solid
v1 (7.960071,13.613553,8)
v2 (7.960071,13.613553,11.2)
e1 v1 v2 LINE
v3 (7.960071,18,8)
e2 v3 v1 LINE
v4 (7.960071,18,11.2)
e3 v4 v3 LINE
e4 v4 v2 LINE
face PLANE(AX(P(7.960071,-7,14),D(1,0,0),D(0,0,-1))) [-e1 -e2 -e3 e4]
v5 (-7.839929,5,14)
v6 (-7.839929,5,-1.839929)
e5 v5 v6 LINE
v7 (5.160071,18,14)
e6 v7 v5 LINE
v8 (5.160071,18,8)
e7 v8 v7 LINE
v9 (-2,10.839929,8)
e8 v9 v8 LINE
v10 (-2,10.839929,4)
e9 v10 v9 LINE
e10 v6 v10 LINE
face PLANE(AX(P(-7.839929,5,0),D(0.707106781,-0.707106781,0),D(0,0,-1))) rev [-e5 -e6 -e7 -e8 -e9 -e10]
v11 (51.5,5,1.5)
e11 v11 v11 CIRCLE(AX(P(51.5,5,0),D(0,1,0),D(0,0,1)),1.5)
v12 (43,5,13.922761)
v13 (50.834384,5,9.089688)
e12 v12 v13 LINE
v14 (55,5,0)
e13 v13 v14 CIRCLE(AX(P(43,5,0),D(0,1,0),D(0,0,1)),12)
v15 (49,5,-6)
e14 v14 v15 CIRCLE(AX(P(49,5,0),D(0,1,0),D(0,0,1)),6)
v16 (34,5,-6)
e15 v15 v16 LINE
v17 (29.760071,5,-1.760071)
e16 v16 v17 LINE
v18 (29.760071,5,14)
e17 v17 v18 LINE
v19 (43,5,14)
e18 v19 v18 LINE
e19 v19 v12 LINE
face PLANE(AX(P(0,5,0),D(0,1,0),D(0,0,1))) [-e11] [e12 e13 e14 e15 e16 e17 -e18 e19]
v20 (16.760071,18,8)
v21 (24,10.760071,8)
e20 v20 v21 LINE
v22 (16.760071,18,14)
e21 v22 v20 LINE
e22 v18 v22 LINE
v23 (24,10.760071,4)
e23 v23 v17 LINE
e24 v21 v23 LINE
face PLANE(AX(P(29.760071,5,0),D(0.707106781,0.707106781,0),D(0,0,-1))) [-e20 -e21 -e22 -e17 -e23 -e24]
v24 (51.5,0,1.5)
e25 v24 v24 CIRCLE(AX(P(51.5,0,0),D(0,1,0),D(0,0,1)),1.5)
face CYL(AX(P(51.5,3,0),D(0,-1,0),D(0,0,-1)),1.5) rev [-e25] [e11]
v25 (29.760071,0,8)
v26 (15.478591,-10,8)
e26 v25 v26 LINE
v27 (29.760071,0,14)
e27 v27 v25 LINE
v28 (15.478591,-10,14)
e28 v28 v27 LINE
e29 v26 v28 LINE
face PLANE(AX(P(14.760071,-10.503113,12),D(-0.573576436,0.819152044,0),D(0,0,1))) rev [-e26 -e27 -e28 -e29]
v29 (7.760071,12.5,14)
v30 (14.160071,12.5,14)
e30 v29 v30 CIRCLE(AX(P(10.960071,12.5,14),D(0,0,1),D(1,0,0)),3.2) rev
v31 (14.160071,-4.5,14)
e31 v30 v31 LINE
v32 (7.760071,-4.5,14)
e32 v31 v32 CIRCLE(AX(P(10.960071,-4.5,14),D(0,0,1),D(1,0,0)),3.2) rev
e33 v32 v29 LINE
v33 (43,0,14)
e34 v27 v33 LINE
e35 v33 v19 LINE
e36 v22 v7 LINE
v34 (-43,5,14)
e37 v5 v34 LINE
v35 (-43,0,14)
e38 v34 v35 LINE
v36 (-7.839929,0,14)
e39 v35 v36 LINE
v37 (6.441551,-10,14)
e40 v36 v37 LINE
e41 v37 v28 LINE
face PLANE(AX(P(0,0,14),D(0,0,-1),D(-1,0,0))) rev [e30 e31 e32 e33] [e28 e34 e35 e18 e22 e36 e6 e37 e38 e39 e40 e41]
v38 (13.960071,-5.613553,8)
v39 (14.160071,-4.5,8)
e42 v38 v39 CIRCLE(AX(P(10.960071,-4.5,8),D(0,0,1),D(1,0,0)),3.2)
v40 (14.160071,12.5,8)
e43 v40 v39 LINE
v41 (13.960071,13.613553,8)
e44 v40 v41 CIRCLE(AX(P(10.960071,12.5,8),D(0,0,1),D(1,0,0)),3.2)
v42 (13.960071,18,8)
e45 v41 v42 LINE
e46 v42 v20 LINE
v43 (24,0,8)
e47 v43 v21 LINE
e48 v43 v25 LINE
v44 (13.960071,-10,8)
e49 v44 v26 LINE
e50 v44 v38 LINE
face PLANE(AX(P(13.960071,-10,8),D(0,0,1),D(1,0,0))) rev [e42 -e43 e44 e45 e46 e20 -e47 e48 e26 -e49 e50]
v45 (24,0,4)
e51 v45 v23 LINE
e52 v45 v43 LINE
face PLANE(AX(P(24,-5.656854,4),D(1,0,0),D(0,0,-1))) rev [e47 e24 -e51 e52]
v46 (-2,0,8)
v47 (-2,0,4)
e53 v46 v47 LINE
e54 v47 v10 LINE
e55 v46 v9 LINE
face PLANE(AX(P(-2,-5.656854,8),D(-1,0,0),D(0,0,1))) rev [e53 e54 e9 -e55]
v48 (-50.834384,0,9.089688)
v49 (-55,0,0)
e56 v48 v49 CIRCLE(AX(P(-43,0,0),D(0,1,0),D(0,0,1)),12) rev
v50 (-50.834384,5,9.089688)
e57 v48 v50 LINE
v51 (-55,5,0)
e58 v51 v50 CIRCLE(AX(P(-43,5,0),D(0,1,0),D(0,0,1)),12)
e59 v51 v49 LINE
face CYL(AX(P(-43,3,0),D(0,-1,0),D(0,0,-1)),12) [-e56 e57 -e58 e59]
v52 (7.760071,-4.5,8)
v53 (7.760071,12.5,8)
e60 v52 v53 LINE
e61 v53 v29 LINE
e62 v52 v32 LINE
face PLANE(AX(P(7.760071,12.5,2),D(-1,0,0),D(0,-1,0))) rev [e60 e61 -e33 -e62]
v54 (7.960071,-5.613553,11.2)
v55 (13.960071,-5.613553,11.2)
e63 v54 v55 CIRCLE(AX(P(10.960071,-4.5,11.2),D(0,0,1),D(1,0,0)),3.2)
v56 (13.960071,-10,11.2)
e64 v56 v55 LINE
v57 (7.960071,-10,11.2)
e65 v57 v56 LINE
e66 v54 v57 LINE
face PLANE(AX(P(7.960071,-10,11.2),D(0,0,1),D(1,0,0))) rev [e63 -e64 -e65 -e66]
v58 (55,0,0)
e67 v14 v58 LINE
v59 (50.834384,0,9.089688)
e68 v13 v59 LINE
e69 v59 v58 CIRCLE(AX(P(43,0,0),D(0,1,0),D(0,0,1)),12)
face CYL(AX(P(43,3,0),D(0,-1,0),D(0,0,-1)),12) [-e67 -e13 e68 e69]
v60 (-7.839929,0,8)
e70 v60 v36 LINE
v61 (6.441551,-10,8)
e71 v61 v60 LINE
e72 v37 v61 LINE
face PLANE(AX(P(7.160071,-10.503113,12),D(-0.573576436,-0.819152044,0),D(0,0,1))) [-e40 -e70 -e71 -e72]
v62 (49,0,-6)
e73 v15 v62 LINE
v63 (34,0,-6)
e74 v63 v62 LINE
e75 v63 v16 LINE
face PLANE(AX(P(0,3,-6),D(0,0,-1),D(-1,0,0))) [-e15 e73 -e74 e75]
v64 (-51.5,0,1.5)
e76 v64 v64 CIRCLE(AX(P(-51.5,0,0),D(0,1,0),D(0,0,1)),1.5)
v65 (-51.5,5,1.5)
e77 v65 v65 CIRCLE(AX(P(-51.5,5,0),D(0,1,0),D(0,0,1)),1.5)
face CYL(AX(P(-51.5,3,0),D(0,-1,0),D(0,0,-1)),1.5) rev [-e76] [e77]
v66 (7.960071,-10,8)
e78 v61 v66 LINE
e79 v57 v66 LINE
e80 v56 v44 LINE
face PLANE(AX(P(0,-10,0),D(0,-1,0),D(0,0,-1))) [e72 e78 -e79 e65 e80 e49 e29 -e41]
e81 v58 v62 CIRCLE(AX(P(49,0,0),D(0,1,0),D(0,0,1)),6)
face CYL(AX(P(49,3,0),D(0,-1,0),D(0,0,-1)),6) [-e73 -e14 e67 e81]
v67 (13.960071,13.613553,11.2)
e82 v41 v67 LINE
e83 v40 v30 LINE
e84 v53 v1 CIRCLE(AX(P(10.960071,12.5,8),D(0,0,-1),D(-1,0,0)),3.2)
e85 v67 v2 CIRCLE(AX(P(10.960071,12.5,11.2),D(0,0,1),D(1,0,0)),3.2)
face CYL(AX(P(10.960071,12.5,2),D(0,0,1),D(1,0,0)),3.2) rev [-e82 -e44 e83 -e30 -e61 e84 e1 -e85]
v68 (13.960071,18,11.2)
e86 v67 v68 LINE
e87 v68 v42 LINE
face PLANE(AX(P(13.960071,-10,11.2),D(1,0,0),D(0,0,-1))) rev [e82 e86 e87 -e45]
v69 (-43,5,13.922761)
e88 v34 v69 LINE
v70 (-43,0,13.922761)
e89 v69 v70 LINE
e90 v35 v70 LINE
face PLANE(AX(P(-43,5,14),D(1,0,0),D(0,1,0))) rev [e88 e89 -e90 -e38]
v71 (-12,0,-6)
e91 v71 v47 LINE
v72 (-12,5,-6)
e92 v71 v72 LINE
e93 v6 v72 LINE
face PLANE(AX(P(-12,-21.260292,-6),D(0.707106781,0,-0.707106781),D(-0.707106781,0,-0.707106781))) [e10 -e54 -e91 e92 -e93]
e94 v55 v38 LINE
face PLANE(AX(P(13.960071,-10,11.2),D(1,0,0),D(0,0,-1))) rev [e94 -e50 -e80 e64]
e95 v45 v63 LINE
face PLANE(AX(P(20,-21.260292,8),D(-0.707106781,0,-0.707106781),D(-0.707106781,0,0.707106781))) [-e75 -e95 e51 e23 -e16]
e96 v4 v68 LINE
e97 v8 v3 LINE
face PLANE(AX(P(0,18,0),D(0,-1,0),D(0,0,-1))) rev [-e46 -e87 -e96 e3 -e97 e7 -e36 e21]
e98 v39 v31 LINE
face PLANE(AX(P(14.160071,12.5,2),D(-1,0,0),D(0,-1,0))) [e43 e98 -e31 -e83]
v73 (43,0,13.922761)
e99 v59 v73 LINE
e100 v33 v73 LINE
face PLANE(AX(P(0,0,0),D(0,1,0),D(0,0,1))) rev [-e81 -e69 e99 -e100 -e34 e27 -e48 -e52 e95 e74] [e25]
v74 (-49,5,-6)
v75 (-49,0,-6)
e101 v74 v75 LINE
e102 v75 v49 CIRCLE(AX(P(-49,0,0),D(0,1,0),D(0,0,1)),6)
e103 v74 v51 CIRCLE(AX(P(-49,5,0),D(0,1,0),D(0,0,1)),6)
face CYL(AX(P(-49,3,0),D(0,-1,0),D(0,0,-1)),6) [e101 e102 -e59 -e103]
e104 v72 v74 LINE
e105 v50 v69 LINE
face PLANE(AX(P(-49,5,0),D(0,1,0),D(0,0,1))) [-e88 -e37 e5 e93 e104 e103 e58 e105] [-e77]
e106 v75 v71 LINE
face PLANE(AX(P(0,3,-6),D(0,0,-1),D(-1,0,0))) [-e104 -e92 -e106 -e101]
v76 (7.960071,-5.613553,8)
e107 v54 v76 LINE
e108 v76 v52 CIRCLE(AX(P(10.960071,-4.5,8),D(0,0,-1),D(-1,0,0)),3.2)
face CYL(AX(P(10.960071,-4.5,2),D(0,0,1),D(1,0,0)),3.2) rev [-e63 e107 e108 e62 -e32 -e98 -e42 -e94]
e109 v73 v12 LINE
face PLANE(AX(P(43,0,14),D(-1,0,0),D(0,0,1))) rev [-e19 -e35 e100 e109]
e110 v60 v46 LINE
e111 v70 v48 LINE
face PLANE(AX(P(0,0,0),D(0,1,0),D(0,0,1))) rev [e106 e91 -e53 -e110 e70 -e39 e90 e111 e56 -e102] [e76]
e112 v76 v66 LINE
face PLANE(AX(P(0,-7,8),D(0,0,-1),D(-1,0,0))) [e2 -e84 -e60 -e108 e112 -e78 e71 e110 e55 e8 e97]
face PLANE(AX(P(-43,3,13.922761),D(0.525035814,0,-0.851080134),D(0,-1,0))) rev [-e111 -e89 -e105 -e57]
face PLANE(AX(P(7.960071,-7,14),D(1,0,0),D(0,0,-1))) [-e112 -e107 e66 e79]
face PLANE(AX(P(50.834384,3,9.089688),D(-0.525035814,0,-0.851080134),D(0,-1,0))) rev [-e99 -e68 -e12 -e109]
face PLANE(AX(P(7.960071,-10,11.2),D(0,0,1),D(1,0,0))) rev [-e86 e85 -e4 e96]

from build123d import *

# Parameters (mm, degrees)
BOSS_EXTRUDE1_DEPTH = 3
CUT_EXTRUDE1_DEPTH  = 10
CUT_EXTRUDE3_START  = 8
SKETCH8_W           = 6
SKETCH8_H           = 3
CUT_EXTRUDE3_DEPTH  = 6
BOSS_EXTRUDE4_START = 18
BOSS_EXTRUDE4_DEPTH = 28
BOSS_EXTRUDE5_DEPTH = 3
CUT_EXTRUDE4_DEPTH  = 3
CUT_EXTRUDE5_DEPTH  = 10
SKETCH18_R          = 1.5
BOSS_EXTRUDE9_DEPTH = 2
CHAMFER1_SIZE       = 15
CHAMFER2_SIZE       = 15
CHAMFER2_SIZE_2     = 10.503113073
CUT_EXTRUDE6_DEPTH  = 5
BOSS_EXTRUDE8_DEPTH = 2
CHAMFER3_DEPTH      = 6
CHAMFER3_2_DEPTH    = 5


with BuildPart() as part:
    # Sketch1 → Boss-Extrude1 (new body)
    with BuildSketch(Plane(origin=(0, 0, 0), x_dir=(1, 0, 0), z_dir=(0, 1, 0))):
        with BuildLine():
            ThreePointArc((-49, -6), (-53.242640687, -4.242640687), (-55, 0))
            ThreePointArc((-55, 0), (-51.485281374, -8.485281374), (-43, -12))
            Line((-43, -12), (43, -12))
            ThreePointArc((43, -12), (51.485281374, -8.485281374), (55, 0))
            ThreePointArc((55, 0), (53.242640687, -4.242640687), (49, -6))
            Line((49, -6), (-49, -6))
        make_face()
        with BuildLine():
            Line((-53, 0), (-55, 0))
            ThreePointArc((-55, 0), (-53.242640687, -4.242640687), (-49, -6))
            Line((-49, -6), (49, -6))
            ThreePointArc((49, -6), (53.242640687, -4.242640687), (55, 0))
            Line((55, 0), (53, 0))
            ThreePointArc((53, 0), (51.5, -1.5), (50, 0))
            Line((50, 0), (-50, 0))
            ThreePointArc((-50, 0), (-51.5, -1.5), (-53, 0))
        make_face()
        with BuildLine():
            Line((49, 6), (-49, 6))
            ThreePointArc((-49, 6), (-53.242640687, 4.242640687), (-55, 0))
            Line((-55, 0), (-53, 0))
            ThreePointArc((-53, 0), (-51.5, 1.5), (-50, 0))
            Line((-50, 0), (50, 0))
            ThreePointArc((50, 0), (51.5, 1.5), (53, 0))
            Line((53, 0), (55, 0))
            ThreePointArc((55, 0), (53.242640687, 4.242640687), (49, 6))
        make_face()
    extrude(amount=BOSS_EXTRUDE1_DEPTH)

    # Sketch2 → Cut-Extrude1 (cut)
    with BuildSketch(Plane(origin=(0, 3, 0), x_dir=(1, 0, 0), z_dir=(0, 1, 0))):
        Polygon((22, -8), (36, 6), (-14, 6), (0, -8), align=None)
    extrude(amount=-CUT_EXTRUDE1_DEPTH, mode=Mode.SUBTRACT)

    # Sketch8 → Cut-Extrude3 (cut)
    with BuildSketch(Plane.XY.offset(CUT_EXTRUDE3_START)):
        with Locations((10.960071178, 1.5)):
            Rectangle(SKETCH8_W, SKETCH8_H)
    extrude(amount=CUT_EXTRUDE3_DEPTH, mode=Mode.SUBTRACT)


with BuildPart() as cut_extrude3_piece_1:
    # of the separate pieces the step leaves, piece 1, a body of its own (cut_extrude3_pieces)
    add(part.part.solids().sort_by_distance((-55, 0, 0))[0])

    # Sketch9 → Boss-Extrude4 (add)
    with BuildSketch(Plane(origin=(0, 0, 0), x_dir=(1, 0, 0), z_dir=(0, 1, 0)).offset(BOSS_EXTRUDE4_START)):
        Polygon((13.960071178, -11.2), (13.960071178, -8), (14.760071178, -8), (14.760071178, -12), (7.160071178, -12), (7.160071178, -8), (7.960071178, -8), (7.960071178, -11.2), align=None)
    extrude(amount=-BOSS_EXTRUDE4_DEPTH)


with BuildPart() as cut_extrude3_piece_2:
    # of the separate pieces the step leaves, piece 2, a body of its own (cut_extrude3_pieces)
    add(part.part.solids().sort_by_distance((13.960071178, 0, 12))[0])


with BuildPart() as cut_extrude3_piece_1_1:
    add(cut_extrude3_piece_1.part)

    # Combine1: union Cut-Extrude3 piece 2
    add(cut_extrude3_piece_2.part)

    # Sketch11 → Boss-Extrude5 (add)
    with BuildSketch(Plane(origin=(0, 3, 0), x_dir=(1, 0, 0), z_dir=(0, 1, 0))):
        Polygon((-14, 6), (-12, 6), (2, -8), (0, -8), align=None)
        Polygon((20, -8), (34, 6), (36, 6), (22, -8), align=None)
    extrude(amount=-BOSS_EXTRUDE5_DEPTH)

    # Sketch13 → Cut-Extrude4 (cut)
    with BuildSketch(Plane(origin=(0, 3, 0), x_dir=(1, 0, 0), z_dir=(0, 1, 0))):
        Polygon((2, -8), (-2, -8), (-2, -4), align=None)
        Polygon((24, -4), (24, -8), (20, -8), align=None)
    extrude(amount=-CUT_EXTRUDE4_DEPTH, mode=Mode.SUBTRACT)

    # Sketch15 → Cut-Extrude5 (cut)
    with BuildSketch(Plane.XY.offset(12)):
        with BuildLine():
            Line((14.160071178, 12.5), (14.160071178, -4.5))
            ThreePointArc((14.160071178, -4.5), (10.960071178, -7.7), (7.760071178, -4.5))
            Line((7.760071178, -4.5), (7.760071178, 12.5))
            ThreePointArc((7.760071178, 12.5), (10.960071178, 15.7), (14.160071178, 12.5))
        make_face()
    extrude(amount=-CUT_EXTRUDE5_DEPTH, mode=Mode.SUBTRACT)

    # Sketch18 → Boss-Extrude9 (add)
    # profile 1 of 2: a face of its own
    with BuildSketch(Plane(origin=(0, 3, 0), x_dir=(1, 0, 0), z_dir=(0, 1, 0))):
        with BuildLine():
            Line((7.160071178, -12), (7.160071178, -8))
            Line((7.160071178, -8), (-2, -8))
            Line((-2, -8), (-2, -4))
            Line((-2, -4), (-12, 6))
            Line((-12, 6), (-49, 6))
            ThreePointArc((-49, 6), (-53.242640687, 4.242640687), (-55, 0))
            ThreePointArc((-55, 0), (-51.485281374, -8.485281374), (-43, -12))
            Line((-43, -12), (7.160071178, -12))
        make_face()
        with Locations((-51.5, 0)):
            Circle(SKETCH18_R, mode=Mode.SUBTRACT)
    # profile 2 of 2: a face of its own
    with BuildSketch(Plane(origin=(0, 3, 0), x_dir=(1, 0, 0), z_dir=(0, 1, 0))):
        with BuildLine():
            Line((34, 6), (24, -4))
            Line((24, -4), (24, -8))
            Line((24, -8), (14.760071178, -8))
            Line((14.760071178, -8), (14.760071178, -12))
            Line((14.760071178, -12), (43, -12))
            ThreePointArc((43, -12), (51.485281374, -8.485281374), (55, 0))
            ThreePointArc((55, 0), (53.242640687, 4.242640687), (49, 6))
            Line((49, 6), (34, 6))
        make_face()
        with Locations((51.5, 0)):
            Circle(SKETCH18_R, mode=Mode.SUBTRACT)
    extrude(amount=BOSS_EXTRUDE9_DEPTH)

    # Chamfer1
    # the kernel refuses this chamfer: 15 mm, written as the material it adds along each edge
    with BuildSketch(Plane(origin=(14.760071178, 5, 8), x_dir=(0, 1, 0), z_dir=(0, 0, 1))) as chamfer1_piece_1_section:
        Polygon((CHAMFER1_SIZE, 0), (0, -CHAMFER1_SIZE), (0, 0), align=None)
    chamfer1_piece_1 = extrude(amount=4, mode=Mode.PRIVATE)
    chamfer1_piece_1 = split(chamfer1_piece_1, bisect_by=Plane(origin=(14.760071178, 18, 8), z_dir=(0, -1, 0)), keep=Keep.TOP, mode=Mode.PRIVATE)
    chamfer1_piece_1 = split(chamfer1_piece_1, bisect_by=Plane(origin=(17.380035589, 5, 10.619964411), z_dir=(-0.7071067811865474, 0, -0.7071067811865477)), keep=Keep.TOP, mode=Mode.PRIVATE)
    add(chamfer1_piece_1)
    with BuildSketch(Plane(origin=(14.760071178, 5, -30.575244819), x_dir=(0, 1, 0), z_dir=(0, 0, 1))) as chamfer1_piece_2_section:
        Polygon((CHAMFER1_SIZE, 0), (0, -CHAMFER1_SIZE), (0, 0), align=None)
    chamfer1_piece_2 = extrude(amount=42.575244819, mode=Mode.PRIVATE)
    chamfer1_piece_2 = split(chamfer1_piece_2, bisect_by=Plane(origin=(14.760071178, 5, 8), z_dir=(0, 0, -1)), keep=Keep.TOP, mode=Mode.PRIVATE)
    chamfer1_piece_2 = split(chamfer1_piece_2, bisect_by=Plane(origin=(36.667657999, 5, -8.667657999), z_dir=(0.7071067811865474, 0, 0.7071067811865477)), keep=Keep.TOP, mode=Mode.PRIVATE)
    chamfer1_piece_2 = split(chamfer1_piece_2, bisect_by=Plane(origin=(24, 5, -30.575244819), z_dir=(1, 0, 0)), keep=Keep.TOP, mode=Mode.PRIVATE)
    add(chamfer1_piece_2)
    with BuildSketch(Plane(origin=(14.760071178, 5, 8), x_dir=(0, 1, 0), z_dir=(0, 0, 1))) as chamfer1_piece_3_section:
        Polygon((CHAMFER1_SIZE, 0), (0, -CHAMFER1_SIZE), (0, 0), align=None)
    chamfer1_piece_3 = extrude(amount=4, mode=Mode.PRIVATE)
    chamfer1_piece_3 = split(chamfer1_piece_3, bisect_by=Plane(origin=(14.760071178, 18, 8), z_dir=(0, -1, 0)), keep=Keep.TOP, mode=Mode.PRIVATE)
    chamfer1_piece_3 = split(chamfer1_piece_3, bisect_by=Plane(origin=(17.380035589, 5, 10.619964411), z_dir=(0.7071067811865474, 0, 0.7071067811865477)), keep=Keep.TOP, mode=Mode.PRIVATE)
    chamfer1_piece_3 = split(chamfer1_piece_3, bisect_by=Plane(origin=(24, 5, 8), z_dir=(-1, 0, 0)), keep=Keep.TOP, mode=Mode.PRIVATE)
    add(chamfer1_piece_3)
    with BuildSketch(Plane(origin=(14.760071178, 5, 8), x_dir=(0, 1, 0), z_dir=(0, 0, 1))) as chamfer1_piece_4_section:
        Polygon((CHAMFER1_SIZE, 0), (0, -CHAMFER1_SIZE), (0, 0), align=None)
    chamfer1_piece_4 = extrude(amount=4, mode=Mode.PRIVATE)
    chamfer1_piece_4 = split(chamfer1_piece_4, bisect_by=Plane(origin=(24, 5, 8), z_dir=(1, 0, 0)), keep=Keep.TOP, mode=Mode.PRIVATE)
    add(chamfer1_piece_4)
    with BuildSketch(Plane(origin=(7.160071178, 5, 12), x_dir=(0, 1, 0), z_dir=(0, 0, -1))) as chamfer1_piece_5_section:
        Polygon((CHAMFER1_SIZE, 0), (0, -CHAMFER1_SIZE), (0, 0), align=None)
    chamfer1_piece_5 = extrude(amount=4, mode=Mode.PRIVATE)
    chamfer1_piece_5 = split(chamfer1_piece_5, bisect_by=Plane(origin=(6.580035589, 5, 12.580035589), z_dir=(-0.7071067811865489, 0, 0.7071067811865461)), keep=Keep.TOP, mode=Mode.PRIVATE)
    chamfer1_piece_5 = split(chamfer1_piece_5, bisect_by=Plane(origin=(-2, 5, 12), z_dir=(1, 0, 0)), keep=Keep.TOP, mode=Mode.PRIVATE)
    chamfer1_piece_5 = split(chamfer1_piece_5, bisect_by=Plane(origin=(7.160071178, 18, 12), z_dir=(0, -1, 0)), keep=Keep.TOP, mode=Mode.PRIVATE)
    add(chamfer1_piece_5)
    with BuildSketch(Plane(origin=(7.160071178, 5, 12), x_dir=(0, 1, 0), z_dir=(0, 0, -1))) as chamfer1_piece_6_section:
        Polygon((CHAMFER1_SIZE, 0), (0, -CHAMFER1_SIZE), (0, 0), align=None)
    chamfer1_piece_6 = extrude(amount=4, mode=Mode.PRIVATE)
    chamfer1_piece_6 = split(chamfer1_piece_6, bisect_by=Plane(origin=(-2, 5, 12), z_dir=(-1, 0, 0)), keep=Keep.TOP, mode=Mode.PRIVATE)
    add(chamfer1_piece_6)
    with BuildSketch(Plane(origin=(7.160071178, 5, 12), x_dir=(0, 1, 0), z_dir=(0, 0, -1))) as chamfer1_piece_7_section:
        Polygon((CHAMFER1_SIZE, 0), (0, -CHAMFER1_SIZE), (0, 0), align=None)
    chamfer1_piece_7 = extrude(amount=4, mode=Mode.PRIVATE)
    chamfer1_piece_7 = split(chamfer1_piece_7, bisect_by=Plane(origin=(6.580035589, 5, 12.580035589), z_dir=(0.7071067811865489, 0, -0.7071067811865461)), keep=Keep.TOP, mode=Mode.PRIVATE)
    chamfer1_piece_7 = split(chamfer1_piece_7, bisect_by=Plane(origin=(7.160071178, 18, 12), z_dir=(0, -1, 0)), keep=Keep.TOP, mode=Mode.PRIVATE)
    add(chamfer1_piece_7)
    with BuildSketch(Plane(origin=(7.160071178, 5, 12), x_dir=(0, 1, 0), z_dir=(0, 0, -1))) as chamfer1_piece_8_section:
        Polygon((CHAMFER1_SIZE, 0), (0, -CHAMFER1_SIZE), (0, 0), align=None)
    chamfer1_piece_8 = extrude(amount=42.575244819, mode=Mode.PRIVATE)
    chamfer1_piece_8 = split(chamfer1_piece_8, bisect_by=Plane(origin=(6.580035589, 5, 12.580035589), z_dir=(-0.7071067811865489, 0, 0.7071067811865461)), keep=Keep.TOP, mode=Mode.PRIVATE)
    chamfer1_piece_8 = split(chamfer1_piece_8, bisect_by=Plane(origin=(-2, 5, 12), z_dir=(-1, 0, 0)), keep=Keep.TOP, mode=Mode.PRIVATE)
    chamfer1_piece_8 = split(chamfer1_piece_8, bisect_by=Plane(origin=(7.160071178, 5, 8), z_dir=(0, 0, -1)), keep=Keep.TOP, mode=Mode.PRIVATE)
    add(chamfer1_piece_8)

    # Chamfer2
    # the kernel refuses this chamfer: 15, 10.503113073 mm, written as the material it adds along each edge
    with BuildSketch(Plane(origin=(7.160071178, 0, 12), x_dir=(-1, 0, 0), z_dir=(0, 0, -1))) as chamfer2_piece_1_section:
        Polygon((CHAMFER2_SIZE, 0), (0, -CHAMFER2_SIZE_2), (0, 0), align=None)
    chamfer2_piece_1 = extrude(amount=4, mode=Mode.PRIVATE)
    chamfer2_piece_1 = split(chamfer2_piece_1, bisect_by=Plane(origin=(-2, 0, 12), z_dir=(-1, 0, 0)), keep=Keep.TOP, mode=Mode.PRIVATE)
    add(chamfer2_piece_1)
    with BuildSketch(Plane(origin=(7.160071178, 0, 12), x_dir=(-1, 0, 0), z_dir=(0, 0, -1))) as chamfer2_piece_2_section:
        Polygon((CHAMFER2_SIZE, 0), (0, -CHAMFER2_SIZE_2), (0, 0), align=None)
    chamfer2_piece_2 = extrude(amount=4, mode=Mode.PRIVATE)
    chamfer2_piece_2 = split(chamfer2_piece_2, bisect_by=Plane(origin=(6.580035589, 0, 12.580035589), z_dir=(-0.7071067811865476, 0, 0.7071067811865476)), keep=Keep.TOP, mode=Mode.PRIVATE)
    chamfer2_piece_2 = split(chamfer2_piece_2, bisect_by=Plane(origin=(-2, 0, 12), z_dir=(1, 0, 0)), keep=Keep.TOP, mode=Mode.PRIVATE)
    add(chamfer2_piece_2)
    with BuildSketch(Plane(origin=(7.160071178, 0, 12), x_dir=(-1, 0, 0), z_dir=(0, 0, -1))) as chamfer2_piece_3_section:
        Polygon((CHAMFER2_SIZE, 0), (0, -CHAMFER2_SIZE_2), (0, 0), align=None)
    chamfer2_piece_3 = extrude(amount=42.738283454, mode=Mode.PRIVATE)
    chamfer2_piece_3 = split(chamfer2_piece_3, bisect_by=Plane(origin=(6.580035589, 0, 12.580035589), z_dir=(-0.7071067811865476, 0, 0.7071067811865476)), keep=Keep.TOP, mode=Mode.PRIVATE)
    chamfer2_piece_3 = split(chamfer2_piece_3, bisect_by=Plane(origin=(7.160071178, 0, 8), z_dir=(0, 0, -1)), keep=Keep.TOP, mode=Mode.PRIVATE)
    chamfer2_piece_3 = split(chamfer2_piece_3, bisect_by=Plane(origin=(-2, 0, 12), z_dir=(-1, 0, 0)), keep=Keep.TOP, mode=Mode.PRIVATE)
    add(chamfer2_piece_3)
    with BuildSketch(Plane(origin=(7.160071178, 0, 12), x_dir=(-1, 0, 0), z_dir=(0, 0, -1))) as chamfer2_piece_4_section:
        Polygon((CHAMFER2_SIZE, 0), (0, -CHAMFER2_SIZE_2), (0, 0), align=None)
    chamfer2_piece_4 = extrude(amount=4, mode=Mode.PRIVATE)
    chamfer2_piece_4 = split(chamfer2_piece_4, bisect_by=Plane(origin=(6.580035589, 0, 12.580035589), z_dir=(0.7071067811865476, 0, -0.7071067811865476)), keep=Keep.TOP, mode=Mode.PRIVATE)
    chamfer2_piece_4 = split(chamfer2_piece_4, bisect_by=Plane(origin=(7.160071178, -10, 12), z_dir=(0, 1, 0)), keep=Keep.TOP, mode=Mode.PRIVATE)
    add(chamfer2_piece_4)
    with BuildSketch(Plane(origin=(14.760071178, 0, 12), x_dir=(0, -1, 0), z_dir=(0, 0, -1))) as chamfer2_piece_5_section:
        Polygon((CHAMFER2_SIZE_2, 0), (0, -CHAMFER2_SIZE), (0, 0), align=None)
    chamfer2_piece_5 = extrude(amount=4, mode=Mode.PRIVATE)
    chamfer2_piece_5 = split(chamfer2_piece_5, bisect_by=Plane(origin=(15.380035589, 0, 12.619964411), z_dir=(0.7071067811865476, 0, 0.7071067811865476)), keep=Keep.TOP, mode=Mode.PRIVATE)
    chamfer2_piece_5 = split(chamfer2_piece_5, bisect_by=Plane(origin=(24, 0, 12), z_dir=(-1, 0, 0)), keep=Keep.TOP, mode=Mode.PRIVATE)
    add(chamfer2_piece_5)
    with BuildSketch(Plane(origin=(14.760071178, 0, 12), x_dir=(0, -1, 0), z_dir=(0, 0, -1))) as chamfer2_piece_6_section:
        Polygon((CHAMFER2_SIZE_2, 0), (0, -CHAMFER2_SIZE), (0, 0), align=None)
    chamfer2_piece_6 = extrude(amount=4, mode=Mode.PRIVATE)
    chamfer2_piece_6 = split(chamfer2_piece_6, bisect_by=Plane(origin=(24, 0, 12), z_dir=(1, 0, 0)), keep=Keep.TOP, mode=Mode.PRIVATE)
    add(chamfer2_piece_6)
    with BuildSketch(Plane(origin=(14.760071178, 0, 12), x_dir=(0, -1, 0), z_dir=(0, 0, -1))) as chamfer2_piece_7_section:
        Polygon((CHAMFER2_SIZE_2, 0), (0, -CHAMFER2_SIZE), (0, 0), align=None)
    chamfer2_piece_7 = extrude(amount=4, mode=Mode.PRIVATE)
    chamfer2_piece_7 = split(chamfer2_piece_7, bisect_by=Plane(origin=(14.760071178, -10, 12), z_dir=(0, 1, 0)), keep=Keep.TOP, mode=Mode.PRIVATE)
    chamfer2_piece_7 = split(chamfer2_piece_7, bisect_by=Plane(origin=(15.380035589, 0, 12.619964411), z_dir=(-0.7071067811865476, 0, -0.7071067811865476)), keep=Keep.TOP, mode=Mode.PRIVATE)
    add(chamfer2_piece_7)
    with BuildSketch(Plane(origin=(14.760071178, 0, 12), x_dir=(0, -1, 0), z_dir=(0, 0, -1))) as chamfer2_piece_8_section:
        Polygon((CHAMFER2_SIZE_2, 0), (0, -CHAMFER2_SIZE), (0, 0), align=None)
    chamfer2_piece_8 = extrude(amount=42.738283454, mode=Mode.PRIVATE)
    chamfer2_piece_8 = split(chamfer2_piece_8, bisect_by=Plane(origin=(14.760071178, 0, 8), z_dir=(0, 0, -1)), keep=Keep.TOP, mode=Mode.PRIVATE)
    chamfer2_piece_8 = split(chamfer2_piece_8, bisect_by=Plane(origin=(15.380035589, 0, 12.619964411), z_dir=(0.7071067811865476, 0, 0.7071067811865476)), keep=Keep.TOP, mode=Mode.PRIVATE)
    chamfer2_piece_8 = split(chamfer2_piece_8, bisect_by=Plane(origin=(24, 0, 12), z_dir=(1, 0, 0)), keep=Keep.TOP, mode=Mode.PRIVATE)
    add(chamfer2_piece_8)

    # Sketch16 → Cut-Extrude6 (cut)
    with BuildSketch(Plane(origin=(0, 0, 0), x_dir=(1, 0, 0), z_dir=(0, 1, 0))):
        Polygon((-7.839928822, 1.839928822), (-2, -4), (-2, -8), (-7.839928822, -8), align=None)
        Polygon((24, -8), (24, -4), (29.760071178, 1.760071178), (29.760071178, -8), align=None)
    extrude(amount=-CUT_EXTRUDE6_DEPTH, mode=Mode.SUBTRACT)

    # Sketch17 → Boss-Extrude8 (add)
    with BuildSketch(Plane.XY.offset(12)):
        Polygon((-7.839928822, 0), (6.441551245, -10), (15.47859111, -10), (29.760071178, 0), (43, 0), (43, 5), (29.760071178, 5), (16.760071178, 18), (5.160071178, 18), (-7.839928822, 5), (-43, 5), (-43, 0), align=None)
        with BuildLine():
            Line((7.760071178, -4.5), (7.760071178, 12.5))
            ThreePointArc((7.760071178, 12.5), (10.960071178, 15.7), (14.160071178, 12.5))
            Line((14.160071178, 12.5), (14.160071178, -4.5))
            ThreePointArc((14.160071178, -4.5), (10.960071178, -7.7), (7.760071178, -4.5))
        make_face(mode=Mode.SUBTRACT)
    extrude(amount=BOSS_EXTRUDE8_DEPTH)

    # Chamfer3: read off the stored shape, not the designer's step
    # Chamfer3 outline → Chamfer3 (cut)
    with BuildSketch(Plane(origin=(0, 0, 0), x_dir=(1, 0, 0), z_dir=(0, 1, 0))):
        with BuildLine():
            ThreePointArc((47.608318931, -11.079864468), (49.300429772, -10.212961602), (50.834384089, -9.08968789))
            Line((50.834384089, -9.08968789), (47.608318931, -11.079864468))
        make_face()
        with BuildLine():
            ThreePointArc((-50.834384089, -9.08968789), (-49.300429772, -10.212961602), (-47.608318931, -11.079864468))
            Line((-47.608318931, -11.079864468), (-50.834384089, -9.08968789))
        make_face()
    extrude(amount=CHAMFER3_DEPTH, mode=Mode.SUBTRACT)

    # Chamfer3 2 outline → Chamfer3 2 (add)
    with BuildSketch(Plane(origin=(0, 0, 0), x_dir=(1, 0, 0), z_dir=(0, 1, 0))):
        with BuildLine():
            Line((43, -13.922760673), (47.608318931, -11.079864468))
            ThreePointArc((47.608318931, -11.079864468), (45.349641077, -11.767717995), (43, -12))
            Line((43, -12), (43, -13.922760673))
        make_face()
        with BuildLine():
            Line((-47.608318931, -11.079864468), (-43, -13.922760673))
            Line((-43, -13.922760673), (-43, -12))
            ThreePointArc((-43, -12), (-45.349641077, -11.767717995), (-47.608318931, -11.079864468))
        make_face()
    extrude(amount=CHAMFER3_2_DEPTH)


solid = cut_extrude3_piece_1_1.part
